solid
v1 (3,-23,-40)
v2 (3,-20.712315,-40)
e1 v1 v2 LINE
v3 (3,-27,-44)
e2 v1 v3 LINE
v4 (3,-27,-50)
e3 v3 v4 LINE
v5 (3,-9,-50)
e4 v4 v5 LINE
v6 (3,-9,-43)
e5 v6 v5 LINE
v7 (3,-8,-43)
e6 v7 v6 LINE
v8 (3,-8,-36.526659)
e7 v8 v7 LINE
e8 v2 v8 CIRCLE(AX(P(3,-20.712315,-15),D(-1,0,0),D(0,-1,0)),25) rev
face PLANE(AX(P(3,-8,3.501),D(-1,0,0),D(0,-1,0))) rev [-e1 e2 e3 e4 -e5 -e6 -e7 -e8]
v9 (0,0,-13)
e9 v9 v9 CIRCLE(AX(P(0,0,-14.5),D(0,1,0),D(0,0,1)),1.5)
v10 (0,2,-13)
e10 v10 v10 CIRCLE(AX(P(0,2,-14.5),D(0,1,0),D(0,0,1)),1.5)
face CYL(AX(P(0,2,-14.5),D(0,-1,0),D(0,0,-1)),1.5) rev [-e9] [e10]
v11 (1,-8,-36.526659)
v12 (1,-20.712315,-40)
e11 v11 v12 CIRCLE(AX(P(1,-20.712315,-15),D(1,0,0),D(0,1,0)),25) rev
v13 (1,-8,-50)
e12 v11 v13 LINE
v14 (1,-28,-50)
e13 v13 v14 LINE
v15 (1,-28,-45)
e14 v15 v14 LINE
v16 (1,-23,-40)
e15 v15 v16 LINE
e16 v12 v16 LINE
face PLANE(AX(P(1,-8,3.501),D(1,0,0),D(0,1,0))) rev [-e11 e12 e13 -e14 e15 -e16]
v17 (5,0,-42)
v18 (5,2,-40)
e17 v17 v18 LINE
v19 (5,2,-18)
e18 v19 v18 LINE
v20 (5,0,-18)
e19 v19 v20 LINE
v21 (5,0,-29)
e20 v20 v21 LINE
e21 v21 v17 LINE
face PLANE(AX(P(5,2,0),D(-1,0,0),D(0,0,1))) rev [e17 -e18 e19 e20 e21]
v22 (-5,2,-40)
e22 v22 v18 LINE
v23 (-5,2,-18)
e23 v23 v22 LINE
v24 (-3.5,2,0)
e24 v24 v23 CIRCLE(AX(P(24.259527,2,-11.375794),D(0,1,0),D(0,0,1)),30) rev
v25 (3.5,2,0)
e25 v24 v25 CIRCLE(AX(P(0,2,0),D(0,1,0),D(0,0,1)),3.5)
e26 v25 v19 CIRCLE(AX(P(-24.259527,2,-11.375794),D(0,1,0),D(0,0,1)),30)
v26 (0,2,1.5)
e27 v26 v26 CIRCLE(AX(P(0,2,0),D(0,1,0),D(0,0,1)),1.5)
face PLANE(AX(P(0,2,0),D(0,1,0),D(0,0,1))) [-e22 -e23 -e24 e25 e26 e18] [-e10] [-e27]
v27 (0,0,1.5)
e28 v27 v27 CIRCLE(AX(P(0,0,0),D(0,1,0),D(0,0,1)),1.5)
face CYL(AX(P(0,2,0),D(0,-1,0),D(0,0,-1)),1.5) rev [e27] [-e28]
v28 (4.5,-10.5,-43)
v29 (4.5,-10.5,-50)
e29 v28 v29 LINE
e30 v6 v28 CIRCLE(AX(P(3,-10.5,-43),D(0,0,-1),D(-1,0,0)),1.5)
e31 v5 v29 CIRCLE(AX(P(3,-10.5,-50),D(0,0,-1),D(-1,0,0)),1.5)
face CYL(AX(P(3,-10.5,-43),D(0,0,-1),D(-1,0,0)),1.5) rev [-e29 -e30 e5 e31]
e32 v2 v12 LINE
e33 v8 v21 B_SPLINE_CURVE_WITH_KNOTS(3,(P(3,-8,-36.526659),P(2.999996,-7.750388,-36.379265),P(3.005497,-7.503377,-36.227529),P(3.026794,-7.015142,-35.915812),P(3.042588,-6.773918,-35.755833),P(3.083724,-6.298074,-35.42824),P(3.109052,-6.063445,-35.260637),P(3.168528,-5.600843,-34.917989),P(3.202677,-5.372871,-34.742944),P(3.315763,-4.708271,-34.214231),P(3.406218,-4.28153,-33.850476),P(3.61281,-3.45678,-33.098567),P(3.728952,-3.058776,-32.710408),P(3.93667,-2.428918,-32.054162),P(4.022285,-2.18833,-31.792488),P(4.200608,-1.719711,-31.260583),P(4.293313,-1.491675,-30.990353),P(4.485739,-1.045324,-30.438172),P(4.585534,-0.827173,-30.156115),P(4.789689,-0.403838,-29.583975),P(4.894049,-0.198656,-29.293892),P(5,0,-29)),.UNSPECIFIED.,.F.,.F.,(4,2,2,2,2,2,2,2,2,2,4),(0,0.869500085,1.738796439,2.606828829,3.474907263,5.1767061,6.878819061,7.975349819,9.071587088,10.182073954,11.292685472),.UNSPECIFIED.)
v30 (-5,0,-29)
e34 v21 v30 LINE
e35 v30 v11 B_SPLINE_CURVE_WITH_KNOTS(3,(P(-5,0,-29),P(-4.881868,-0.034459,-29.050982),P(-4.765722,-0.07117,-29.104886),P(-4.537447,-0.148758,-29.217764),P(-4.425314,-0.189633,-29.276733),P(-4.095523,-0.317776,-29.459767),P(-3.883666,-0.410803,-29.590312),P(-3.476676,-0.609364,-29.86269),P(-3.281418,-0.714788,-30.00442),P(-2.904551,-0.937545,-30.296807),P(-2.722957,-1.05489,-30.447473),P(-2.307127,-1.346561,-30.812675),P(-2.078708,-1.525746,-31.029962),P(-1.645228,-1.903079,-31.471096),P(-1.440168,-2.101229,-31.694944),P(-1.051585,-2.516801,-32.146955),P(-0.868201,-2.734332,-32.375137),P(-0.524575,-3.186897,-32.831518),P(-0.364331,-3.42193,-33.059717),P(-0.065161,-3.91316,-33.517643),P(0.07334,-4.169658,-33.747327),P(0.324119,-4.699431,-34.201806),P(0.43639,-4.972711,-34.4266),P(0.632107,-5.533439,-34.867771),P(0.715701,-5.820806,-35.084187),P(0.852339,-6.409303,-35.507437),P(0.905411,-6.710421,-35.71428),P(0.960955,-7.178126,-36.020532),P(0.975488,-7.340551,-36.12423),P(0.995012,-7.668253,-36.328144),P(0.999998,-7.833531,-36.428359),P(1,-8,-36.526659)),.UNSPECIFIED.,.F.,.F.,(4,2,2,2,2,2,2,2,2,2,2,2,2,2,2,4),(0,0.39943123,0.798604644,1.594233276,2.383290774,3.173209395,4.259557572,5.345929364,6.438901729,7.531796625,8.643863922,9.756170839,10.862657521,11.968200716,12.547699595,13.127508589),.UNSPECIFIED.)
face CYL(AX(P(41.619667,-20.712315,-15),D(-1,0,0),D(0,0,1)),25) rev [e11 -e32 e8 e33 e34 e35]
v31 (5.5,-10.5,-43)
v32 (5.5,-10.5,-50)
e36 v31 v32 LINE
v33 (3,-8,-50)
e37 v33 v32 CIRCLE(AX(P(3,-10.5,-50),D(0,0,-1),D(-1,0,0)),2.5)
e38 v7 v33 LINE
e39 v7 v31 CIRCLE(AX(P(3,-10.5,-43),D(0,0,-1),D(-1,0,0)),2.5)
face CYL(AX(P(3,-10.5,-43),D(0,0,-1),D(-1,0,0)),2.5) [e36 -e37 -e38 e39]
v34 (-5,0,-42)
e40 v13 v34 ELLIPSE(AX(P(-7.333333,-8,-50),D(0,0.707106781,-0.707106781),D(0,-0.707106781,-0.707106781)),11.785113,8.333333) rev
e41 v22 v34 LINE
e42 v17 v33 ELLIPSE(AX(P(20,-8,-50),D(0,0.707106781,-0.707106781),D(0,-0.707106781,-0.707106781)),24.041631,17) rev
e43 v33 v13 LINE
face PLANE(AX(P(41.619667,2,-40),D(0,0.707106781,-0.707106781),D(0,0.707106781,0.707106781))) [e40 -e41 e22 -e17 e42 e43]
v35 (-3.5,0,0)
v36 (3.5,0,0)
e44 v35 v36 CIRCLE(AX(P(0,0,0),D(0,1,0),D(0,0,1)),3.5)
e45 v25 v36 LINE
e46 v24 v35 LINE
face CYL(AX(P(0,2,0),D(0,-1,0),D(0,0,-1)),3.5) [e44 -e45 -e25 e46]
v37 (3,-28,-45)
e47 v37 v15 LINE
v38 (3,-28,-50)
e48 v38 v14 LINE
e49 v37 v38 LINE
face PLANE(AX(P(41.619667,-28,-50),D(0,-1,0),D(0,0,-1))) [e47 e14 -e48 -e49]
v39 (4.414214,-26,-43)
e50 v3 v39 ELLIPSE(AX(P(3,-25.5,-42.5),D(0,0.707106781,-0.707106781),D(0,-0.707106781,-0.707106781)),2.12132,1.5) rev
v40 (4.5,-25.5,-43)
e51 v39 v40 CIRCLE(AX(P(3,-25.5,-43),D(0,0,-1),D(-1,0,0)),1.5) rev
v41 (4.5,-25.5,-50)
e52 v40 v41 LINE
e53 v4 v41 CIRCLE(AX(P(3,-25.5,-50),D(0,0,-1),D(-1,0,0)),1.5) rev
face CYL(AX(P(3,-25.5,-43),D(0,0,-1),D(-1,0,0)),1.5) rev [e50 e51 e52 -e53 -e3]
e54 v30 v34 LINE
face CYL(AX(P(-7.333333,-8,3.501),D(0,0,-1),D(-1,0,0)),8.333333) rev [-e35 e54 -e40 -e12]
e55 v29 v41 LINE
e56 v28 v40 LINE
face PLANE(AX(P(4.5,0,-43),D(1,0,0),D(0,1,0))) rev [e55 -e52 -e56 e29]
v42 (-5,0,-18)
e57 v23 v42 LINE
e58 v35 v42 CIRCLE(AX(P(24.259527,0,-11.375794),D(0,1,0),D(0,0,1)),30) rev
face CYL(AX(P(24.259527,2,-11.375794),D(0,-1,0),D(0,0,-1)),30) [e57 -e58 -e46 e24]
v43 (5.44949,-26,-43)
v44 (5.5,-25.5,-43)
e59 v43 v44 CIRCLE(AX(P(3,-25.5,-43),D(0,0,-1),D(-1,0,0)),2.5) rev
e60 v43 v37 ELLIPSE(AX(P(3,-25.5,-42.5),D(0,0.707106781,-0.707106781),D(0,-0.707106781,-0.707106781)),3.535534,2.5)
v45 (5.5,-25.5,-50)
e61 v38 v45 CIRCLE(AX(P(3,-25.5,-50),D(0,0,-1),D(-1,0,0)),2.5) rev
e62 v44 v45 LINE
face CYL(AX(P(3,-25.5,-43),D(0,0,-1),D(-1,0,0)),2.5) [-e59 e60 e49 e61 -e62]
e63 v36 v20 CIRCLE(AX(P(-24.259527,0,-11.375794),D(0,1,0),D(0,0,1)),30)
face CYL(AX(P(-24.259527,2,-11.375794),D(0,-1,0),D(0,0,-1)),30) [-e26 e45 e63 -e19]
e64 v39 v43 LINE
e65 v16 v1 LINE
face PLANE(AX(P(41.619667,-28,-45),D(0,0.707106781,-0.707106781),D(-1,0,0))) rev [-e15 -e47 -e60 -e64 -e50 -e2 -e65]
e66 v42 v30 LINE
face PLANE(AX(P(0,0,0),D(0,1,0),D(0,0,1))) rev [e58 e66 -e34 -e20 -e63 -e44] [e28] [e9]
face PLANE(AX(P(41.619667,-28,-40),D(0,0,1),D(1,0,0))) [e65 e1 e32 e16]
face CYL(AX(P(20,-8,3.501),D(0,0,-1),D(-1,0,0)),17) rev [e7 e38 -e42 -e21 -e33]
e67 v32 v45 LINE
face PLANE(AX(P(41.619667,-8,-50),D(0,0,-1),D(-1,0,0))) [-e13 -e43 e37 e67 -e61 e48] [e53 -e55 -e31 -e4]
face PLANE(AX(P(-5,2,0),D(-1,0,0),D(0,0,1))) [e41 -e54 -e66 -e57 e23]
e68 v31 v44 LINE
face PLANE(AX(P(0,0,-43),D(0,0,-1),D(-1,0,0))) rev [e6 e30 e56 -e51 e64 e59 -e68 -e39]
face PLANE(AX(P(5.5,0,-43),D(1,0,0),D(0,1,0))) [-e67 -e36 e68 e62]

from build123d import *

# Parameters (mm, degrees)
SKETCH1_W           = 10
SKETCH1_H           = 22
SKETCH1_R           = 1.5
SKETCH1_R_2         = 3.5
BOSS_EXTRUDE1_DEPTH = 2
BOSS_EXTRUDE2_DEPTH = 10
CUT_EXTRUDE1_REACH  = 62.656
BOSS_EXTRUDE3_DEPTH = 7
CHAMFER1_SIZE       = 5


with BuildPart() as part:
    # Sketch1 → Boss-Extrude1 (new body)
    # profile 1 of 3: a face of its own
    with BuildSketch(Plane(origin=(0, 0, 0), x_dir=(1, 0, 0), z_dir=(0, 1, 0))):
        with Locations((0, 29)):
            Rectangle(SKETCH1_W, SKETCH1_H)
    # profile 2 of 3: a face of its own
    with BuildSketch(Plane(origin=(0, 0, 0), x_dir=(1, 0, 0), z_dir=(0, 1, 0))):
        with BuildLine():
            Line((5, 18), (-5, 18))
            ThreePointArc((-5, 18), (-5.636846209, 8.884429483), (-3.5, 0))
            ThreePointArc((-3.5, 0), (0, 3.5), (3.5, 0))
            ThreePointArc((3.5, 0), (5.636846209, 8.884429483), (5, 18))
        make_face()
        with Locations(Location((0, 14.5, 0), (0, 0, 270))):
            Circle(SKETCH1_R, mode=Mode.SUBTRACT)
    # profile 3 of 3: a face of its own
    with BuildSketch(Plane(origin=(0, 0, 0), x_dir=(1, 0, 0), z_dir=(0, 1, 0))):
        Circle(SKETCH1_R_2)
        with Locations(Location((0, 0, 0), (0, 0, 270))):
            Circle(SKETCH1_R, mode=Mode.SUBTRACT)
    extrude(amount=BOSS_EXTRUDE1_DEPTH)

    # Sketch2 → Boss-Extrude2 (add)
    with BuildSketch(Plane.ZY.offset(5)):
        with BuildLine():
            Line((-40, 2), (-50, -8))
            Line((-50, -8), (-50, -28))
            Line((-50, -28), (-40, -28))
            Line((-40, -28), (-40, -20.712315177))
            ThreePointArc((-40, -20.712315177), (-37.079402166, -8.986275778), (-29, 0))
            Line((-29, 0), (-40, 2))
        make_face()
    extrude(amount=-BOSS_EXTRUDE2_DEPTH)

    # Sketch3 → Cut-Extrude1 (cut, up to next)
    with BuildSketch(Plane(origin=(0, 0, -50), x_dir=(-1, 0, 0), z_dir=(0, 0, -1)), mode=Mode.PRIVATE) as cut_extrude1_sk1:
        with BuildLine():
            Line((-3, -8), (-3, -28))
            Line((-3, -28), (-5, -28))
            Line((-5, -28), (-5, 0))
            ThreePointArc((-5, 0), (-3.507577498, -3.876894374), (-3, -8))
        make_face()
    cut_extrude1_tool1 = extrude(cut_extrude1_sk1.sketch, amount=-CUT_EXTRUDE1_REACH, mode=Mode.PRIVATE) & part.part
    # Sketch3 → Cut-Extrude1 (cut, up to next)
    with BuildSketch(Plane(origin=(0, 0, -50), x_dir=(-1, 0, 0), z_dir=(0, 0, -1)), mode=Mode.PRIVATE) as cut_extrude1_sk2:
        with BuildLine():
            Line((-1, -8), (-1, -28))
            Line((-1, -28), (5, -28))
            Line((5, -28), (5, 0))
            ThreePointArc((5, 0), (0.666666667, -3), (-1, -8))
        make_face()
    cut_extrude1_tool2 = extrude(cut_extrude1_sk2.sketch, amount=-CUT_EXTRUDE1_REACH, mode=Mode.PRIVATE) & part.part
    add(cut_extrude1_tool1.solids().sort_by_distance((4.041628, -15.231137, -50))[0], mode=Mode.SUBTRACT)
    add(cut_extrude1_tool2.solids().sort_by_distance((-2.115152, -14.990475, -50))[0], mode=Mode.SUBTRACT)

    # Sketch4 → Boss-Extrude3 (add)
    with BuildSketch(Plane(origin=(0, 0, -50), x_dir=(-1, 0, 0), z_dir=(0, 0, -1))):
        with BuildLine():
            ThreePointArc((-3, -8), (-4.767766953, -8.732233047), (-5.5, -10.5))
            Line((-5.5, -10.5), (-5.5, -25.5))
            ThreePointArc((-5.5, -25.5), (-4.767766953, -27.267766953), (-3, -28))
            Line((-3, -28), (-3, -27))
            ThreePointArc((-3, -27), (-4.060660172, -26.560660172), (-4.5, -25.5))
            Line((-4.5, -25.5), (-4.5, -10.5))
            ThreePointArc((-4.5, -10.5), (-4.060660172, -9.439339828), (-3, -9))
            Line((-3, -9), (-3, -8))
        make_face()
    extrude(amount=-BOSS_EXTRUDE3_DEPTH)

    # Chamfer1
    # the kernel refuses this chamfer: 5 mm, written as the material it takes off along each edge
    with BuildSketch(Plane(origin=(-11.85841494, -28, -40), x_dir=(0, 0.9996219169112968, 0.027495876610586317), z_dir=(1, 0, 0))) as chamfer1_piece_1:
        Polygon((CHAMFER1_SIZE * 0.999621916911, -CHAMFER1_SIZE * 0.0274958766106), (-CHAMFER1_SIZE * 0.0274958766106, -CHAMFER1_SIZE * 0.999621916911), (0, 0), align=None)
    extrude(amount=27.71682988, mode=Mode.SUBTRACT)


solid = part.part
